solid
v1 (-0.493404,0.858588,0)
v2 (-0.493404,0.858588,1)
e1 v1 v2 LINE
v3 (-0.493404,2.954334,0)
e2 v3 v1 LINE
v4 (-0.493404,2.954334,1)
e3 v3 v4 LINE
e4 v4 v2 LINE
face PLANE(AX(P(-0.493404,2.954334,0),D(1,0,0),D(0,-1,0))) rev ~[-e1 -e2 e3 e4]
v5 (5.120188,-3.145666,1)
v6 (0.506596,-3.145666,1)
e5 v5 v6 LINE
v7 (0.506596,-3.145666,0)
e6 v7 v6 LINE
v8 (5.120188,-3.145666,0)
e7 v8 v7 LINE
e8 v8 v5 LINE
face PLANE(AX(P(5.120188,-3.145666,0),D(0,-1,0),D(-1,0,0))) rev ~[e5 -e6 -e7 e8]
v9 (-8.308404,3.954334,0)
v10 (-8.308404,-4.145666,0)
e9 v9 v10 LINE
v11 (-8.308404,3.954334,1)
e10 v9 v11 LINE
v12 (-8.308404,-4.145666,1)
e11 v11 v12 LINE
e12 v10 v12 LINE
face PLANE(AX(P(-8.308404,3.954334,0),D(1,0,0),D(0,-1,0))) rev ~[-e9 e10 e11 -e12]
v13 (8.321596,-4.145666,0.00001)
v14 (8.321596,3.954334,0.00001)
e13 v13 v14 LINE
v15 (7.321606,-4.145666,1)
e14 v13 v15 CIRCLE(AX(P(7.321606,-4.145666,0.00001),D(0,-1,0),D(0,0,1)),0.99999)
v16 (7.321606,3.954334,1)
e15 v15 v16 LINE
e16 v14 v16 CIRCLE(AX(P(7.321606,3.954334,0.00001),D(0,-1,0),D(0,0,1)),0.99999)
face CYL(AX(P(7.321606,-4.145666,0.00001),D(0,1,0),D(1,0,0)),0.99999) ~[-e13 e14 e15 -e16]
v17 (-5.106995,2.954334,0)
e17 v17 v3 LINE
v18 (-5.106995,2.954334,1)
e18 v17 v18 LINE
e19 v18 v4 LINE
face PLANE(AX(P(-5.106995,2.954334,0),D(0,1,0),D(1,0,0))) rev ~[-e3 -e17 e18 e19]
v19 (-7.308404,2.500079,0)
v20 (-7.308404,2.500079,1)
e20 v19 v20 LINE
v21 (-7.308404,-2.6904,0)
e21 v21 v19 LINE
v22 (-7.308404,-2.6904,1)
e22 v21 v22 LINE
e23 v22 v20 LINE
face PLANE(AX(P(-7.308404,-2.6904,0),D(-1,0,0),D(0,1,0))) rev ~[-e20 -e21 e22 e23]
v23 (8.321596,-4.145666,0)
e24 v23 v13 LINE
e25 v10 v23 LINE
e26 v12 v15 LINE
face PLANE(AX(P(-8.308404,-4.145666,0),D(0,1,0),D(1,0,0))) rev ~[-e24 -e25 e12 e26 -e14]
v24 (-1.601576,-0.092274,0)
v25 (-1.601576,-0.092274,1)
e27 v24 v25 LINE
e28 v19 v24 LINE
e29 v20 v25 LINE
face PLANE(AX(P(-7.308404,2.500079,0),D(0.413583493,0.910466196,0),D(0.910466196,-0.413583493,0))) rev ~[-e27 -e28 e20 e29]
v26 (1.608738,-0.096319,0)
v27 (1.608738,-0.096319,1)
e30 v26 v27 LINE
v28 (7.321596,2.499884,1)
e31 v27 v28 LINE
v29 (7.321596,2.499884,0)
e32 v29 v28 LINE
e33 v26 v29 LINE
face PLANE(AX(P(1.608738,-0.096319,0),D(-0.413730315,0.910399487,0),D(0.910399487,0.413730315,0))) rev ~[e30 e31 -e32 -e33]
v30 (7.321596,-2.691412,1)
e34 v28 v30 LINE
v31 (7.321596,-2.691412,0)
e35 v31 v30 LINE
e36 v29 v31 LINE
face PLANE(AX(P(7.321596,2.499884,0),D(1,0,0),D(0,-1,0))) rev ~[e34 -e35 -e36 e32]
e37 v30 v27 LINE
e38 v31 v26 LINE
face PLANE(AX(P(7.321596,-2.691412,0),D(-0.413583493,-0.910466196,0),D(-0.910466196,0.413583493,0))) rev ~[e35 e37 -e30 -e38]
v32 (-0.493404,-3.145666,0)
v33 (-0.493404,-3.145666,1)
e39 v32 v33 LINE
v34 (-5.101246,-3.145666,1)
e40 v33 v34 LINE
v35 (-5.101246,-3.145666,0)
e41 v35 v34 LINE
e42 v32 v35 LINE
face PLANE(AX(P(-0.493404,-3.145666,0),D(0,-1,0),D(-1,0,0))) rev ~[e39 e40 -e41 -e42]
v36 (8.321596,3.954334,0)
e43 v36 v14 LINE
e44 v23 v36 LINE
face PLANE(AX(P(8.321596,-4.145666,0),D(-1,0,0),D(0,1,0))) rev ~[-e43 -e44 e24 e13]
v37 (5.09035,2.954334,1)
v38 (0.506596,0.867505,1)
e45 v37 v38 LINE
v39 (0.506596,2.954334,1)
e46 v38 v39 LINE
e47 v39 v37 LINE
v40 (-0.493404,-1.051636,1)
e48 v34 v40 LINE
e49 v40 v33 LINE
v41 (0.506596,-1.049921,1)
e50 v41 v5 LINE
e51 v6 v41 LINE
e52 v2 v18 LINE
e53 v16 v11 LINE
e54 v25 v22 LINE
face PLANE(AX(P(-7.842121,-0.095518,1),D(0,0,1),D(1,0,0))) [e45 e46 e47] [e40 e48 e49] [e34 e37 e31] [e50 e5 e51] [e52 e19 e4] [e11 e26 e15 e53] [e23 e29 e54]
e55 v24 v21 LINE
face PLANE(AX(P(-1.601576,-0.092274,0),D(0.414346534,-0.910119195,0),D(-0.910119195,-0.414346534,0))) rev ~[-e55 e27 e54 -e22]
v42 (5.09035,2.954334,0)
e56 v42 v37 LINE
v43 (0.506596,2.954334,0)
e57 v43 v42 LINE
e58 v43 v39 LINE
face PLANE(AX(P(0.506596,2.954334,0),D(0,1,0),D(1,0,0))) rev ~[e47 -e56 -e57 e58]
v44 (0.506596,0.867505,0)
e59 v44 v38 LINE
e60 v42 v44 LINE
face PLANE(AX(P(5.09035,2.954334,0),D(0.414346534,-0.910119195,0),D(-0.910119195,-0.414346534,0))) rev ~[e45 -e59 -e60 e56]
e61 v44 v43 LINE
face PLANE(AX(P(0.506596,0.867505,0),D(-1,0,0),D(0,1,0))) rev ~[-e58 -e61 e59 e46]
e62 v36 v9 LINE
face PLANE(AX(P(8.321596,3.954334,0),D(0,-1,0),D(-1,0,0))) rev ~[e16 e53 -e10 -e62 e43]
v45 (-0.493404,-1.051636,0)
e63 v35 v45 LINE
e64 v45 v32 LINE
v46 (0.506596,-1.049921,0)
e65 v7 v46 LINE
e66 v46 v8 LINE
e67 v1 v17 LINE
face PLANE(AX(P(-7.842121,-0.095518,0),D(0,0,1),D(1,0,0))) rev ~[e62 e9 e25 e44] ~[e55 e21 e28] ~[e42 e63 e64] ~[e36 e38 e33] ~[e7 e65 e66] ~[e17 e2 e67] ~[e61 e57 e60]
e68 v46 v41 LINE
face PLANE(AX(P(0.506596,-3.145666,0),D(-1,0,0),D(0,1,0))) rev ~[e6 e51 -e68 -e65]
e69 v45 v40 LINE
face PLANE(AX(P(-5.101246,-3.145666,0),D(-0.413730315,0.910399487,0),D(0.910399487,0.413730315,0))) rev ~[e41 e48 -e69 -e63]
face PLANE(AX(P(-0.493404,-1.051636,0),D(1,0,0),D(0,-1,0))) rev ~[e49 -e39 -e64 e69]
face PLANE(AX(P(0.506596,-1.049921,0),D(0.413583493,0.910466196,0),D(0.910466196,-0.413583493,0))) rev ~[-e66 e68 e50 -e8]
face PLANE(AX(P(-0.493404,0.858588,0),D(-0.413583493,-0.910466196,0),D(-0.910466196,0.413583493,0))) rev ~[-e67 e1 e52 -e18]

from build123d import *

# Parameters (mm, degrees)
F1_DEPTH = 1
F2_R     = 0.99999


# Not quite as in the source:
# - a fillet or chamfer is up to 0.001 mm smaller than in the source, because OpenCascade refuses the exact size


with BuildPart() as f1:
    # F0 (on Top) → F1 (new body)
    with BuildSketch(Plane.XY):
        Polygon((-7.3084038651, 2.5000789639), (-8.3084038651, 2.9543336025), (-8.3084038651, -3.1456663975), (-7.3084038651, -2.6904001687), align=None)
        Polygon((-7.3084038651, 2.9543336025), (-8.3084038651, 2.9543336025), (-7.3084038651, 2.5000789639), align=None)
        Polygon((-7.3084038651, 3.9543336025), (-8.3084038651, 3.9543336025), (-8.3084038651, 2.9543336025), (-7.3084038651, 2.9543336025), (-5.1069954144, 2.9543336025), align=None)
        Polygon((-7.3084038651, -2.6904001687), (-8.3084038651, -3.1456663975), (-7.3084038651, -3.1456663975), align=None)
        Polygon((-7.3084038651, -3.1456663975), (-8.3084038651, -3.1456663975), (-8.3084038651, -4.1456663975), (-7.3017124087, -4.1456663975), (-5.1012464166, -3.1456663975), align=None)
        Polygon((-0.4934038651, -3.1456663975), (-5.1012464166, -3.1456663975), (-7.3017124087, -4.1456663975), (7.3215961349, -4.1456663975), (5.1201876842, -3.1456663975), (0.5065961349, -3.1456663975), align=None)
        Polygon((-7.3084038651, -2.6904001687), (-7.3084038651, -3.1456663975), (-5.1012464166, -3.1456663975), (-0.4934038651, -1.0516360566), (-0.4934038651, -0.5956663975), (-1.6015758867, -0.0922741165), align=None)
        Polygon((-0.0026520019, 0.6356619308), (-0.4934038651, 0.4122391807), (-0.4934038651, -0.5956663975), (0.0083764092, -0.8236024146), (0.5065961349, -0.597186861), (0.5065961349, 0.4043336025), align=None)
        Polygon((0.0083764092, -0.8236024146), (-0.4934038651, -0.5956663975), (-0.4934038651, -1.0516360566), align=None)
        Polygon((0.5065961349, -0.597186861), (0.0083764092, -0.8236024146), (0.5065961349, -1.0499210361), align=None)
        Polygon((1.6087379174, -0.0963194146), (0.5065961349, 0.4043336025), (0.5065961349, -0.597186861), align=None)
        Polygon((-0.0026520019, 0.6356619308), (-0.4934038651, 0.858588241), (-0.4934038651, 0.4122391807), align=None)
        Polygon((0.5065961349, 0.4043336025), (0.5065961349, 0.8675054096), (-0.0026520019, 0.6356619308), align=None)
        Polygon((0.5065961349, 2.9543336025), (-0.4934038651, 2.9543336025), (-0.4934038651, 0.858588241), (-0.0026520019, 0.6356619308), (0.5065961349, 0.8675054096), align=None)
        Polygon((-0.4934038651, -1.0516360566), (-0.4934038651, -3.1456663975), (0.5065961349, -3.1456663975), (0.5065961349, -1.0499210361), (0.0083764092, -0.8236024146), align=None)
        Polygon((7.3215961349, 2.9543336025), (5.0903496856, 2.9543336025), (0.5065961349, 0.8675054096), (0.5065961349, 0.4043336025), (1.6087379174, -0.0963194146), (7.3215961349, 2.4998844069), align=None)
        Polygon((8.3215961349, 3.9543336025), (7.2868666612, 3.9543336025), (5.0903496856, 2.9543336025), (7.3215961349, 2.9543336025), (8.3215961349, 2.9543336025), align=None)
        Polygon((7.3215961349, 2.4998844069), (8.3215961349, 2.9543336025), (7.3215961349, 2.9543336025), align=None)
        Polygon((8.3215961349, -3.1456663975), (8.3215961349, 2.9543336025), (7.3215961349, 2.4998844069), (7.3215961349, -2.691411759), align=None)
        Polygon((7.3215961349, -3.1456663975), (8.3215961349, -3.1456663975), (7.3215961349, -2.691411759), align=None)
        Polygon((8.3215961349, -4.1456663975), (8.3215961349, -3.1456663975), (7.3215961349, -3.1456663975), (5.1201876842, -3.1456663975), (7.3215961349, -4.1456663975), align=None)
        Polygon((-0.4934038651, 0.858588241), (-5.1069954144, 2.9543336025), (-7.3084038651, 2.9543336025), (-7.3084038651, 2.5000789639), (-1.6015758867, -0.0922741165), (-0.4934038651, 0.4122391807), align=None)
        Polygon((-0.4934038651, 0.4122391807), (-1.6015758867, -0.0922741165), (-0.4934038651, -0.5956663975), align=None)
        Polygon((5.1201876842, -3.1456663975), (7.3215961349, -3.1456663975), (7.3215961349, -2.691411759), (1.6087379174, -0.0963194146), (0.5065961349, -0.597186861), (0.5065961349, -1.0499210361), align=None)
        Polygon((7.2868666612, 3.9543336025), (-7.3084038651, 3.9543336025), (-5.1069954144, 2.9543336025), (-0.4934038651, 2.9543336025), (0.5065961349, 2.9543336025), (5.0903496856, 2.9543336025), align=None)
    extrude(amount=F1_DEPTH)

    # F2 (radius 1 in the source; OpenCascade refuses exactly that, so slightly less here)
    f2_edges = [f1.edges().sort_by_distance(p)[0] for p in [
        (8.321596, -0.095666, 1),
    ]]
    fillet(f2_edges, radius=F2_R)


solid = f1.part
